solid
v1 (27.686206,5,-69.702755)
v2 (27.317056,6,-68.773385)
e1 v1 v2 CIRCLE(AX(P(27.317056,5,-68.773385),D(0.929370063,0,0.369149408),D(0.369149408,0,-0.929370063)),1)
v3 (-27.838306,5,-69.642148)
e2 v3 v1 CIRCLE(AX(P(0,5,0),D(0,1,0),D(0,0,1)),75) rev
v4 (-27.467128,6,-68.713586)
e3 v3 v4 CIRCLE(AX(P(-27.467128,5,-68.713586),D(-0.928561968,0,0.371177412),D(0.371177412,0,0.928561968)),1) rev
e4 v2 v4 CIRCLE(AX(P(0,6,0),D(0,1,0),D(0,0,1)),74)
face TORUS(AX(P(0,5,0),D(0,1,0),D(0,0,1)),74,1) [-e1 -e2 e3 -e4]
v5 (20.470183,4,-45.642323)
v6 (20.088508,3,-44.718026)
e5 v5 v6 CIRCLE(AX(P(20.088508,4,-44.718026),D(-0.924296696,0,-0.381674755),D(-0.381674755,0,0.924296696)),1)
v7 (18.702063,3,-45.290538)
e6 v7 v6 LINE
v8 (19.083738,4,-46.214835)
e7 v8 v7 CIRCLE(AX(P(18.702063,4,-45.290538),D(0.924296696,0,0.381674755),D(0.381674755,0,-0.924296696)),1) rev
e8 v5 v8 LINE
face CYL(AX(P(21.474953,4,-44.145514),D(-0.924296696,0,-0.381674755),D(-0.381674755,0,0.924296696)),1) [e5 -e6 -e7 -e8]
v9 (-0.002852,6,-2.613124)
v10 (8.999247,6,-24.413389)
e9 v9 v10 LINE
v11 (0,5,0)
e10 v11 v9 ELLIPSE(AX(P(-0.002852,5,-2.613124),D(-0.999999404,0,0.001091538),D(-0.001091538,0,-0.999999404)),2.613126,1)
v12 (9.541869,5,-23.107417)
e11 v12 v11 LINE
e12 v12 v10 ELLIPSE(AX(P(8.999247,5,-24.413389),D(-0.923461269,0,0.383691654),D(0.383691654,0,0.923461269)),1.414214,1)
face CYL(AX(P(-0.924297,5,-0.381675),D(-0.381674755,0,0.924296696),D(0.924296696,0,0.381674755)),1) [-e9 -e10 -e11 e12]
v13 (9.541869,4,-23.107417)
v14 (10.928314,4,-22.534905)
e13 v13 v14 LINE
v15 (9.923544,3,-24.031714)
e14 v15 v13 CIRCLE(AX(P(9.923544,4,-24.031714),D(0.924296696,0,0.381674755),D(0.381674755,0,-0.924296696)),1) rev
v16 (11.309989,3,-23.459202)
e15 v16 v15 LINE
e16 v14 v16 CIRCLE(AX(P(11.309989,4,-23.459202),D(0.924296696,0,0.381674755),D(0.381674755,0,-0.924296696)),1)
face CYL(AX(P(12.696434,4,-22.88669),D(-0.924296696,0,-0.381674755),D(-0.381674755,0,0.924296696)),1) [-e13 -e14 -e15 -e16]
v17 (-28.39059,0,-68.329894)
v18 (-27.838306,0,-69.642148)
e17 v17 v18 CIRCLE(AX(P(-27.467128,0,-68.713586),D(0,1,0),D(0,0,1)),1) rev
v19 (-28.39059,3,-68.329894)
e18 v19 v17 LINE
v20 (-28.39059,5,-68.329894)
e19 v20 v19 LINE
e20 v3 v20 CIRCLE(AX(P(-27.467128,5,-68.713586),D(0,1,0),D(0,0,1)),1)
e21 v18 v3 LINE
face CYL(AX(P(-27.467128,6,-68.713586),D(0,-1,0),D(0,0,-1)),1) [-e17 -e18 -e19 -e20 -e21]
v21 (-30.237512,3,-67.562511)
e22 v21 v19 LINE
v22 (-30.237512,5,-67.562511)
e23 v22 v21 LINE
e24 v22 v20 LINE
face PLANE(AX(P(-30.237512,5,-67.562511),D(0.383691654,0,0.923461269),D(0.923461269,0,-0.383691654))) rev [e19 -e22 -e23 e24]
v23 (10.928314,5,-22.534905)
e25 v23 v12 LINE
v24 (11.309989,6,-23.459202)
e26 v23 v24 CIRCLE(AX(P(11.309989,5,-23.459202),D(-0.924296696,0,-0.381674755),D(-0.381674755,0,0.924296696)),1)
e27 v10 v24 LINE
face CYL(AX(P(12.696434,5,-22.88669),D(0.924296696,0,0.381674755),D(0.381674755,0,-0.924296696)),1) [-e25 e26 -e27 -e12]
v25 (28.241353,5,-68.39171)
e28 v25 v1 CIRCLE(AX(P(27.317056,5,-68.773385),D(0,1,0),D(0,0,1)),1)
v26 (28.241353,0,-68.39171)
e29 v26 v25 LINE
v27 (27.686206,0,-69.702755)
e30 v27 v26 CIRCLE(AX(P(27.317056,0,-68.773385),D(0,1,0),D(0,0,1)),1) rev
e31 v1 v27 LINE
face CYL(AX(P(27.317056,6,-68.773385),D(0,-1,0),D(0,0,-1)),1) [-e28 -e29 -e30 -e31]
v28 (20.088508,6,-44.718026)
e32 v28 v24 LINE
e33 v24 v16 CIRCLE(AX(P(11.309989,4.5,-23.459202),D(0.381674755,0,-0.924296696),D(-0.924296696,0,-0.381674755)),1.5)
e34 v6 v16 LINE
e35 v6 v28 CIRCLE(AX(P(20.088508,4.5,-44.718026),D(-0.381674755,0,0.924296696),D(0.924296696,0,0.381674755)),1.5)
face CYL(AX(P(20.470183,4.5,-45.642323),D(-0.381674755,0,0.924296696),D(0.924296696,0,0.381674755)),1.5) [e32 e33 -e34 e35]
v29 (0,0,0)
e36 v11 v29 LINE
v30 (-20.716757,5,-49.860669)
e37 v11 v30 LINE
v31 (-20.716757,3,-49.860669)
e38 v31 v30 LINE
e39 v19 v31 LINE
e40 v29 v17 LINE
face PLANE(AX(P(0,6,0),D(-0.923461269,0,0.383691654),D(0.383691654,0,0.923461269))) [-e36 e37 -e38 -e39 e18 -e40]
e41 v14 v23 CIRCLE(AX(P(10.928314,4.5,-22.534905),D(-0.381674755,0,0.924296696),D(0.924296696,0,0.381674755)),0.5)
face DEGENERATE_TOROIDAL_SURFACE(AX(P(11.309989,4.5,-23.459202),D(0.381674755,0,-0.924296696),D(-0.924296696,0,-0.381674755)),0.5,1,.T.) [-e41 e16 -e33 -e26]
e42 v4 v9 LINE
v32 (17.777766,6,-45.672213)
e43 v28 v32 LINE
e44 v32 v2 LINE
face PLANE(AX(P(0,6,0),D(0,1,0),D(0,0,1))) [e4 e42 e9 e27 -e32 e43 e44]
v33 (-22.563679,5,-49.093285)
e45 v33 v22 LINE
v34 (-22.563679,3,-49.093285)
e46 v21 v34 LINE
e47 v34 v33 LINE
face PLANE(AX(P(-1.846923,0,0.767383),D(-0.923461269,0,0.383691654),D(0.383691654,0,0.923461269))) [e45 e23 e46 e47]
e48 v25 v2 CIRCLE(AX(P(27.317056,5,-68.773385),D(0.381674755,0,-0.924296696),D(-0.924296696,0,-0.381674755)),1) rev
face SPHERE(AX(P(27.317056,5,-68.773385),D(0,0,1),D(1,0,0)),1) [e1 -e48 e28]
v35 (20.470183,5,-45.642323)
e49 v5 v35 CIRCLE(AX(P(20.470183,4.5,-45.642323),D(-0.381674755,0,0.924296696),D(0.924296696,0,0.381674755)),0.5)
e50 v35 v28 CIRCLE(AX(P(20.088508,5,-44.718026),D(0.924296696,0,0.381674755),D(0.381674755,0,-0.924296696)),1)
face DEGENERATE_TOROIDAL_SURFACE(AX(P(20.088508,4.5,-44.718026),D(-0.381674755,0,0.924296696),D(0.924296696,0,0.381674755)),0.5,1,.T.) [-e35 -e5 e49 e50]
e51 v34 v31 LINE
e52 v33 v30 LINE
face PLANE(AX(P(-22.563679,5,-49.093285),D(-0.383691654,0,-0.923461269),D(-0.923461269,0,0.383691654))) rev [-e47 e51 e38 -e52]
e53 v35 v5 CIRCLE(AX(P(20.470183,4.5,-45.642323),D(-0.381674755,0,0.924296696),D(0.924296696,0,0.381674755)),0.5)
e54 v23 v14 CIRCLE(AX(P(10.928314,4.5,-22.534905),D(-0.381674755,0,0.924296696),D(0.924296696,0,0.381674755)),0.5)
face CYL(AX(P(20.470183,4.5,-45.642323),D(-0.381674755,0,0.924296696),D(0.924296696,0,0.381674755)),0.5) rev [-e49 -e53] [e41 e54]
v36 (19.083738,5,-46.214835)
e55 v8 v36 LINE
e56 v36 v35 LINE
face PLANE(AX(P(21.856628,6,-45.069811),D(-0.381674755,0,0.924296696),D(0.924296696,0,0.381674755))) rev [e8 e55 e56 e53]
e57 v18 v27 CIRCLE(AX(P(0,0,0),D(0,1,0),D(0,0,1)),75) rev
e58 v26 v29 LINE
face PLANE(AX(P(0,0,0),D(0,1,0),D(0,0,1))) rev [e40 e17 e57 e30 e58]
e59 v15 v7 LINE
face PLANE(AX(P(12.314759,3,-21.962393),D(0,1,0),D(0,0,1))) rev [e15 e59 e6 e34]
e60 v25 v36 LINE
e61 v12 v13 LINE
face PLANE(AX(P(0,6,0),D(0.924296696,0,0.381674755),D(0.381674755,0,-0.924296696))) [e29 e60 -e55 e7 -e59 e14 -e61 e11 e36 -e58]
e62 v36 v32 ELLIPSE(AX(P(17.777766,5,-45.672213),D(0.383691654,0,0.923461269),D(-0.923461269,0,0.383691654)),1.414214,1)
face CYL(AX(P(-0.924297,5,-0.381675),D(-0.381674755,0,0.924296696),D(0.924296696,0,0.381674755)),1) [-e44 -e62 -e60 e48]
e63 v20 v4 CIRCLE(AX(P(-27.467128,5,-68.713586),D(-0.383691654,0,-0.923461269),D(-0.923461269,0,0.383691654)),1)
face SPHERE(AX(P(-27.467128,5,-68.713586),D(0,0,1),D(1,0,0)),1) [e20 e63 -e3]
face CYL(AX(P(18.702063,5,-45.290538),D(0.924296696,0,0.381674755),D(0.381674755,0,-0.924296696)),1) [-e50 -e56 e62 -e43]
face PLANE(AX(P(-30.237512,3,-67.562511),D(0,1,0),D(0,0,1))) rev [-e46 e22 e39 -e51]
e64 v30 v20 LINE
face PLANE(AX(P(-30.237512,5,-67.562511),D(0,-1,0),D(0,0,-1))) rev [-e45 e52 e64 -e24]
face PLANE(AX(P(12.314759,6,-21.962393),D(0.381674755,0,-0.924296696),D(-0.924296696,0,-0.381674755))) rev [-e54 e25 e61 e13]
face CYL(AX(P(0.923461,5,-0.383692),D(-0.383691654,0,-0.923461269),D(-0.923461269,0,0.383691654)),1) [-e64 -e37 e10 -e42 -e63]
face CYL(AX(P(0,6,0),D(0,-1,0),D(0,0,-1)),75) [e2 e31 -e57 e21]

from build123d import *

# Parameters (mm, degrees)
BOSS_EXTRUDE1_DEPTH = 6
SKETCH3_W           = 25
SKETCH3_H           = 3
BOSS_EXTRUDE2_DEPTH = 3
SKETCH4_R           = 0.5
CUT_EXTRUDE2_DEPTH  = 25
CUT_EXTRUDE3_DEPTH  = 25
FILLET1_R           = 1
SKETCH9_W           = 20
SKETCH9_H           = 2
BOSS_EXTRUDE3_DEPTH = 2


with BuildPart() as part:
    # Sketch2 → Boss-Extrude1 (new body)
    with BuildSketch(Plane(origin=(0, 0, 0), x_dir=(1, 0, 0), z_dir=(0, 1, 0))):
        with BuildLine():
            ThreePointArc((-28.776874041, 69.25959515), (-0.08186534, 74.99995532), (28.625606617, 69.322252169))
            Line((28.625606617, 69.322252169), (-28.776874041, 69.25959515))
        make_face()
        Polygon((0, 0), (-28.776874041, 69.25959515), (28.625606617, 69.322252169), align=None)
    extrude(amount=BOSS_EXTRUDE1_DEPTH)

    # Sketch3 → Boss-Extrude2 (add)
    with BuildSketch(Plane(origin=(0, 0, 0), x_dir=(0.3816747548947935, 0, -0.924296695588597), z_dir=(0.9242966955885968, 0, 0.38167475489479347))):
        with Locations((37.5, 4.5)):
            Rectangle(SKETCH3_W, SKETCH3_H)
    extrude(amount=BOSS_EXTRUDE2_DEPTH)

    # Sketch4 → Cut-Extrude2 (cut)
    with BuildSketch(Plane(origin=(9.541868872, 0, -23.10741739), x_dir=(0.9242966955885968, 0, 0.3816747548947936), z_dir=(-0.3816747548947936, 0, 0.9242966955885968))):
        with Locations((1.5, 4.5)):
            Circle(SKETCH4_R)
    extrude(amount=-CUT_EXTRUDE2_DEPTH, mode=Mode.SUBTRACT)

    # Sketch8 → Cut-Extrude3 (cut)
    with BuildSketch(Plane(origin=(9.541868872, 0, -23.10741739), x_dir=(0.9242966955885968, 0, 0.3816747548947936), z_dir=(-0.3816747548947936, 0, 0.9242966955885968))):
        with BuildLine():
            Line((1.5, 6), (3.46050078, 6))
            Line((3.46050078, 6), (3.46050078, 3))
            Line((3.46050078, 3), (1.5, 3))
            ThreePointArc((1.5, 3), (3, 4.5), (1.5, 6))
        make_face()
    extrude(amount=-CUT_EXTRUDE3_DEPTH, mode=Mode.SUBTRACT)

    # Fillet1
    fillet1_edges = [part.edges().sort_by_distance(p)[0] for p in [
        (-14.388437021, 6, -34.629797575),
        (4.770934436, 6, -11.553708695),
        (23.854672181, 6, -57.768543474),
        (19.776960266, 6, -45.928578713),
        (19.776960266, 3, -45.928578713),
        (10.235091394, 3, -22.821161324),
        (10.235091394, 6, -22.821161324),
        (21.856627832, 4.5, -45.069810515),
        (12.314758959, 4.5, -21.962393125),
        (-0.08186534, 6, -74.99995532),
        (28.625606617, 3, -69.322252169),
        (-28.776874041, 3, -69.25959515),
    ]]
    fillet(fillet1_edges, radius=FILLET1_R - 0.0001)  # a hair under: the kernel refuses the full size

    # Sketch9 → Boss-Extrude3 (add)
    with BuildSketch(Plane(origin=(0, 0, 0), x_dir=(0.38369165388519433, 0, 0.9234612686728363), z_dir=(-0.9234612686728362, 0, 0.3836916538851943))):
        with Locations((-63.993242935, 4)):
            Rectangle(SKETCH9_W, SKETCH9_H)
    extrude(amount=BOSS_EXTRUDE3_DEPTH)


solid = part.part
